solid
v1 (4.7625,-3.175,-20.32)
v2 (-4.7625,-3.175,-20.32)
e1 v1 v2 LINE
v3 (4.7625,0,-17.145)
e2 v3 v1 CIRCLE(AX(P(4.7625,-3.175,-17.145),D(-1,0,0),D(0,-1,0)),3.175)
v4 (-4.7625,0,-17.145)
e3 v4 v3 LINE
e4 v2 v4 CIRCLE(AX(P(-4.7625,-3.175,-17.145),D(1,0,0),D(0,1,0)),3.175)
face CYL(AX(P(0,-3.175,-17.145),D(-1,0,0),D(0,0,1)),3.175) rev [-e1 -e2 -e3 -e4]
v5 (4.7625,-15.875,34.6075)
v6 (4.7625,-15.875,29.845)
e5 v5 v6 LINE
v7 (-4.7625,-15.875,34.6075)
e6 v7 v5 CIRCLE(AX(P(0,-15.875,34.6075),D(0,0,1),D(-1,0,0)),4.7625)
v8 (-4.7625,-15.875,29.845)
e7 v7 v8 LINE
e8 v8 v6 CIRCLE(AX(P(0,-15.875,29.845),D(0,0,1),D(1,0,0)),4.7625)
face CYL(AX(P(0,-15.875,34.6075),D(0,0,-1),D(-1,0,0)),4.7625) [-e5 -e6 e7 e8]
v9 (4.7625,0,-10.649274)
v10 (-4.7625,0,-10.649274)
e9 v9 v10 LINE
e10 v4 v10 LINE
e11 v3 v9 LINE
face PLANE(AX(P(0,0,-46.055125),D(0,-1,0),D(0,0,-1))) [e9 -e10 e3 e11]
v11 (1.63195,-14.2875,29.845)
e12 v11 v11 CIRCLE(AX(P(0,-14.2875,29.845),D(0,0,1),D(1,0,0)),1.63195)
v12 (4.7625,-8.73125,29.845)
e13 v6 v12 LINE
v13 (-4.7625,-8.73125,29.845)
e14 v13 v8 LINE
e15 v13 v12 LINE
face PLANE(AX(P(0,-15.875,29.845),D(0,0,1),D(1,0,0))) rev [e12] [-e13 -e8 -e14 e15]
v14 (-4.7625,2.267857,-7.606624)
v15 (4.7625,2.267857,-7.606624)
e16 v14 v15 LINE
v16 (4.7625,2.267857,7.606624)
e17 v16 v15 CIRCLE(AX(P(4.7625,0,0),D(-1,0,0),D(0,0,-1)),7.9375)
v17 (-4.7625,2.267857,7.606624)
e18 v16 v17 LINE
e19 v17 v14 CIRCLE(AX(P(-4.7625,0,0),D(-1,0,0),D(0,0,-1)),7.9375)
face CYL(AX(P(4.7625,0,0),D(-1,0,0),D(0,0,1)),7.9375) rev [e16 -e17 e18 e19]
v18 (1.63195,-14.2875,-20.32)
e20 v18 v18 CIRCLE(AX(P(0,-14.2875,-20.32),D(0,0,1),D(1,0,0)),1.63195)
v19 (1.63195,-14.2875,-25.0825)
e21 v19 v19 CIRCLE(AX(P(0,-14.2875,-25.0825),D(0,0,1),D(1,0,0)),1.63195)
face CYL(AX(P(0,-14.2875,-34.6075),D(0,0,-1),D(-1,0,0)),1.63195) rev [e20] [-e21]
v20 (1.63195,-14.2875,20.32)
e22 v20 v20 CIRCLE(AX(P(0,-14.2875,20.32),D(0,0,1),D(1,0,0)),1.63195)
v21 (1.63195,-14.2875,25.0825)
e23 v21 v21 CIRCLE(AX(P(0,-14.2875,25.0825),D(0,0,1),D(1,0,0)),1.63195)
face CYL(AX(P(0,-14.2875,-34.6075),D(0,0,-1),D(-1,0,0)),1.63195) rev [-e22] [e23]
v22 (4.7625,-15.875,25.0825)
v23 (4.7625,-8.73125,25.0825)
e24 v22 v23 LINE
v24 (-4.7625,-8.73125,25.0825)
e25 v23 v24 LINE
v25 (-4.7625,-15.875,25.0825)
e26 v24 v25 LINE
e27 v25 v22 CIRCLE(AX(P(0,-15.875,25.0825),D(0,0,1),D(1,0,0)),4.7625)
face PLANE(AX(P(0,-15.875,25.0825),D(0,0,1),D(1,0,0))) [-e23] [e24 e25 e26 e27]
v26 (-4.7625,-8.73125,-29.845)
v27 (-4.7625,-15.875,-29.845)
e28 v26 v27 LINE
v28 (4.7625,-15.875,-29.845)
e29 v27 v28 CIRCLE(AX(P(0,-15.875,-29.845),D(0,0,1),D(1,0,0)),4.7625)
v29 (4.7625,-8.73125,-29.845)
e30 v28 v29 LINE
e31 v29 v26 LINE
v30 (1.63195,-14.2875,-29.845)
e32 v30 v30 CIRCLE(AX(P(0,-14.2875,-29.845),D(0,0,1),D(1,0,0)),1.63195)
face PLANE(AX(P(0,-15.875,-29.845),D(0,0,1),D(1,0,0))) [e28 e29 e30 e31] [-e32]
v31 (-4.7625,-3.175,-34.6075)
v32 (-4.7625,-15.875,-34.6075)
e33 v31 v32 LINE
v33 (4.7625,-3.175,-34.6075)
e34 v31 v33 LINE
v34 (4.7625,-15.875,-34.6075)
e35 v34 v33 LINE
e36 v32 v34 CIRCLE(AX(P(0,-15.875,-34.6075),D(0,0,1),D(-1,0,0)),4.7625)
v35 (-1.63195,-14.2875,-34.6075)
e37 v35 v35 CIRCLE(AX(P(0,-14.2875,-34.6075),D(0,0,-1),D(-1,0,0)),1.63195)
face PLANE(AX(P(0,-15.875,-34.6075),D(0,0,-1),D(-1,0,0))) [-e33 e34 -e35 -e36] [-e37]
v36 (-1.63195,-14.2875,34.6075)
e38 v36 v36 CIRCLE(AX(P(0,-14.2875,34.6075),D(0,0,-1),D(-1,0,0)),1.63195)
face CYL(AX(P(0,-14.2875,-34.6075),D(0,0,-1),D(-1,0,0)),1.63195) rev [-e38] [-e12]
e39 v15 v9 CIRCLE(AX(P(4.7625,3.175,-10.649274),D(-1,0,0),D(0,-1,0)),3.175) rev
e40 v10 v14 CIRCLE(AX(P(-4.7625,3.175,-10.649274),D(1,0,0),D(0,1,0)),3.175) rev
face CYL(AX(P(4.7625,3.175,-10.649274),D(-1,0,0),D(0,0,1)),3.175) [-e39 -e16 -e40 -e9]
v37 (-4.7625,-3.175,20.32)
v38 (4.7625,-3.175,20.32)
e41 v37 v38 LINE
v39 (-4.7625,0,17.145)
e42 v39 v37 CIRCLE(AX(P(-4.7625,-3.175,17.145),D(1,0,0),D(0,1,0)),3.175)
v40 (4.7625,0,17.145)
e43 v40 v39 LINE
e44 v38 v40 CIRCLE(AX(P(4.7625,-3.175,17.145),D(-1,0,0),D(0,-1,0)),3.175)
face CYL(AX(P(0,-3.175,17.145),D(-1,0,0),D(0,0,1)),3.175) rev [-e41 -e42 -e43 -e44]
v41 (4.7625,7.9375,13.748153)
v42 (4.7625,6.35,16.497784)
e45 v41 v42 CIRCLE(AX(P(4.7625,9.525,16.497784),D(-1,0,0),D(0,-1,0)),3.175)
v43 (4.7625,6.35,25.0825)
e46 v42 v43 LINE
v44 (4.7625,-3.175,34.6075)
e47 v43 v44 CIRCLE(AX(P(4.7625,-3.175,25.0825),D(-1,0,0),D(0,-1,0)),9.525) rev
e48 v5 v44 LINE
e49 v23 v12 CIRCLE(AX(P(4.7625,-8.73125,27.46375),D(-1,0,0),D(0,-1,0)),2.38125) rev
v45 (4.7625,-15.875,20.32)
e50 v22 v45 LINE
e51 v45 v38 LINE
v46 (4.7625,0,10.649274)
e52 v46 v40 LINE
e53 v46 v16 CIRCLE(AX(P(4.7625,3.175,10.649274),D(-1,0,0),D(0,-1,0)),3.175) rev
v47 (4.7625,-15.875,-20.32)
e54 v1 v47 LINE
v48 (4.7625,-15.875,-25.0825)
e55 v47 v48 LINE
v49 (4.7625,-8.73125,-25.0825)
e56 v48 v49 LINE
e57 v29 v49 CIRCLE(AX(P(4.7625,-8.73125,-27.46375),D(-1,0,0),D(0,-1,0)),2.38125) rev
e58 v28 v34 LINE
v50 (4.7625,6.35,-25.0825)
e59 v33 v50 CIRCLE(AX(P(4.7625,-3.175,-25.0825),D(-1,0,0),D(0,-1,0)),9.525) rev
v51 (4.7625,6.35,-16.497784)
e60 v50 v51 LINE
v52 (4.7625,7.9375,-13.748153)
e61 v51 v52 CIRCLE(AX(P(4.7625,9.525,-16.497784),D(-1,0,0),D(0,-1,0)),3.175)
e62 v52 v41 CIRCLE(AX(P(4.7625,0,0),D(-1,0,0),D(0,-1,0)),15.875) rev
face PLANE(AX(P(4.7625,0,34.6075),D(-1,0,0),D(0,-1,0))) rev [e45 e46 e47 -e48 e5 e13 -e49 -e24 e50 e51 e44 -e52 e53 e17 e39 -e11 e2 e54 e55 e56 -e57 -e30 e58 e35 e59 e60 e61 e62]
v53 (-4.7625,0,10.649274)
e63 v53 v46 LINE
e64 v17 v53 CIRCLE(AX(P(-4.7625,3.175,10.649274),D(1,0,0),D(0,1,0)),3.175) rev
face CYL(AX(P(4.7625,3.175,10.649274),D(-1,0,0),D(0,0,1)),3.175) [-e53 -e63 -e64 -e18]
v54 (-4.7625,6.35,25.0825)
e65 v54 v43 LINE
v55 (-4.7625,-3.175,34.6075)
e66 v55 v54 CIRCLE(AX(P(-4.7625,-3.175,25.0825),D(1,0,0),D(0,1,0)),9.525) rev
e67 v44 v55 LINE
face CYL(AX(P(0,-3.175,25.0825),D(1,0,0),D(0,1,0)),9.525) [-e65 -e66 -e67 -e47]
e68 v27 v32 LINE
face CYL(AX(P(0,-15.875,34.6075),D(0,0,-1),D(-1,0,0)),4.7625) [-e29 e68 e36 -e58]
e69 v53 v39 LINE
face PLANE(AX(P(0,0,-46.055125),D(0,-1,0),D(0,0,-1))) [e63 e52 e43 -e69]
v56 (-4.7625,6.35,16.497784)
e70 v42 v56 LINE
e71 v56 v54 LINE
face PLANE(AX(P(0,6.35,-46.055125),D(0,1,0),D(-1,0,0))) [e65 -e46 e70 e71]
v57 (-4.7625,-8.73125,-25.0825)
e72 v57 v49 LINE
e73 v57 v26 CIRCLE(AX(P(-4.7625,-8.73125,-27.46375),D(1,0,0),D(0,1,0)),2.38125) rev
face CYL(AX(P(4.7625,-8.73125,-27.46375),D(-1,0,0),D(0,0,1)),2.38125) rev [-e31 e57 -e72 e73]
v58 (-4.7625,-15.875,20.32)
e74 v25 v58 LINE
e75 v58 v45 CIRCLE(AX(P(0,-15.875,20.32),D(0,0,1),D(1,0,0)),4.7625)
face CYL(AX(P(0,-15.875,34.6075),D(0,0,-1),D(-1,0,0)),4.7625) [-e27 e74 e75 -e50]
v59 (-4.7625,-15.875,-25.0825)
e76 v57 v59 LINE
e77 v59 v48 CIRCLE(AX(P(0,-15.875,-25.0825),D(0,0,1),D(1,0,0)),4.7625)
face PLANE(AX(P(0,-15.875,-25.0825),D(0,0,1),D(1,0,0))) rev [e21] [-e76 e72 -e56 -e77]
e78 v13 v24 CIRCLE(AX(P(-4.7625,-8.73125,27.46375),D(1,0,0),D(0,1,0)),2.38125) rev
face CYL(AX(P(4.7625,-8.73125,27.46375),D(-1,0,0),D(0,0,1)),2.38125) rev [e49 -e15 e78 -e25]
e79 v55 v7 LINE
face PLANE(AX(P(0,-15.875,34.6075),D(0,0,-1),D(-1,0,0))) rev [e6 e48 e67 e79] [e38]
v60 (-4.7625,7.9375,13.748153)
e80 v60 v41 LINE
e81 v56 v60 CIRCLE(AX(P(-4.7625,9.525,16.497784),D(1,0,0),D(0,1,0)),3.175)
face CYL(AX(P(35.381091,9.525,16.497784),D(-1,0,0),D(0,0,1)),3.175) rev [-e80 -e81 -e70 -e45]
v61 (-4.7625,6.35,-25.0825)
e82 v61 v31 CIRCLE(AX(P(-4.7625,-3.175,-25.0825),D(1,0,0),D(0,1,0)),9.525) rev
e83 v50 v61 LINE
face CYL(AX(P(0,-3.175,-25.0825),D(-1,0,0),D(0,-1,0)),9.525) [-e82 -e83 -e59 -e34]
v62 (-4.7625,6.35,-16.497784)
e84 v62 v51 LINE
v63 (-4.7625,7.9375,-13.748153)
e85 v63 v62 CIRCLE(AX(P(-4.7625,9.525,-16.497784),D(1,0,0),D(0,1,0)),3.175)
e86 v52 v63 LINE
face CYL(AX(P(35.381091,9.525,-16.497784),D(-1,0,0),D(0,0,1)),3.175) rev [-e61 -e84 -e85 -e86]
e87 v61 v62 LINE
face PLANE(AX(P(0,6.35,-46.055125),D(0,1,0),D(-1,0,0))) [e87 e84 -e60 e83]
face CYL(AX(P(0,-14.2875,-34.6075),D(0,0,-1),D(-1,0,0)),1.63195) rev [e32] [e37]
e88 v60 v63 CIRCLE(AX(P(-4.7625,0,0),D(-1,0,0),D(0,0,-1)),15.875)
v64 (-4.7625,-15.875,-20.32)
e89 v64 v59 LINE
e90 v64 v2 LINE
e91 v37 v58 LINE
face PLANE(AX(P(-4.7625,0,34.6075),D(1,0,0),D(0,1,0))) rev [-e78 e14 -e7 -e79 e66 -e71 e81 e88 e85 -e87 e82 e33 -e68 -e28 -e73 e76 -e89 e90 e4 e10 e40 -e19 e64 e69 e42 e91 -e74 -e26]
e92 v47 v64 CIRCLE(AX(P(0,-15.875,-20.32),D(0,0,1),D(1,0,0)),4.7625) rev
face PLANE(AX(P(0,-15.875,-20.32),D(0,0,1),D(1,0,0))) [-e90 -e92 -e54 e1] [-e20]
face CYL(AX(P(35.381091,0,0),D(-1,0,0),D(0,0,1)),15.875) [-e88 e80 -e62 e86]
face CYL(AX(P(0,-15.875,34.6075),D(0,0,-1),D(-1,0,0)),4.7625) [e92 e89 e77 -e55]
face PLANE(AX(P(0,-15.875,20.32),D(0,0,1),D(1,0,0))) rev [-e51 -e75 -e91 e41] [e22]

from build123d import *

# Parameters (mm, degrees)
BOSS_EXTRUDE1_DEPTH   = 34.6075
CUT_EXTRUDE1_START    = -4.7625
CUT_EXTRUDE1_DEPTH    = 4.7625
CUT_EXTRUDE2_START    = 9.525
CUT_EXTRUDE2_DEPTH    = 4.7625
CUT_EXTRUDE3_START    = -4.7625
CUT_EXTRUDE3_DEPTH    = 40.64
BOSS_EXTRUDE3_START   = 34.6075
SKETCH7_W             = 9.525
SKETCH7_H             = 6.35
BOSS_EXTRUDE3_DEPTH   = 69.215
FILLET1_R             = 3.175
FILLET2_R             = 2.38125
FILLET3_R             = 2.38125
BOSS_EXTRUDE4_DEPTH   = 9.525
CUT_EXTRUDE4_DEPTH    = 42.40423997
FILLET4_R             = 3.175
FILLET5_R             = 9.525
F_4_CLEARANCE_HOLE1_D = 3.2639


with BuildPart() as part:
    # Sketch1 → Boss-Extrude1 (new, symmetric)
    with BuildSketch(Plane.XY):
        with BuildLine():
            Line((-4.7625, 0), (4.7625, 0))
            Line((4.7625, 0), (4.7625, -15.875))
            ThreePointArc((4.7625, -15.875), (0, -20.6375), (-4.7625, -15.875))
            Line((-4.7625, -15.875), (-4.7625, 0))
        make_face()
    extrude(amount=BOSS_EXTRUDE1_DEPTH, both=True)

    # Sketch2 → Cut-Extrude1 (cut)
    with BuildSketch(Plane.XY.offset(34.6075).offset(CUT_EXTRUDE1_START)):
        with BuildLine():
            Line((-4.7625, -15.875), (-4.7625, -6.35))
            Line((-4.7625, -6.35), (4.7625, -6.35))
            Line((4.7625, -6.35), (4.7625, -15.875))
            ThreePointArc((4.7625, -15.875), (0, -20.6375), (-4.7625, -15.875))
        make_face()
    extrude(amount=-CUT_EXTRUDE1_DEPTH, mode=Mode.SUBTRACT)

    # Sketch3 → Cut-Extrude2 (cut)
    with BuildSketch(Plane.XY.offset(-34.6075).offset(CUT_EXTRUDE2_START)):
        with BuildLine():
            Line((-4.7625, -15.875), (-4.7625, -6.35))
            Line((-4.7625, -6.35), (4.7625, -6.35))
            Line((4.7625, -6.35), (4.7625, -15.875))
            ThreePointArc((4.7625, -15.875), (0, -20.6375), (-4.7625, -15.875))
        make_face()
    extrude(amount=-CUT_EXTRUDE2_DEPTH, mode=Mode.SUBTRACT)

    # Sketch5 → Cut-Extrude3 (cut)
    with BuildSketch(Plane.XY.offset(25.0825).offset(CUT_EXTRUDE3_START)):
        with BuildLine():
            Line((4.7625, -15.875), (4.7625, 0))
            Line((4.7625, 0), (-4.7625, 0))
            Line((-4.7625, 0), (-4.7625, -15.875))
            ThreePointArc((-4.7625, -15.875), (0, -20.6375), (4.7625, -15.875))
        make_face()
    extrude(amount=-CUT_EXTRUDE3_DEPTH, mode=Mode.SUBTRACT)


with BuildPart() as cut_extrude3_piece_1:
    # of the separate pieces the step leaves, piece 1, a body of its own (cut_extrude3_pieces)
    add(part.part.solids().sort_by_distance((-4.7625, 0, 20.32))[0])



with BuildPart() as cut_extrude3_piece_2:
    # of the separate pieces the step leaves, piece 2, a body of its own (cut_extrude3_pieces)
    add(part.part.solids().sort_by_distance((-4.7625, -15.875, -34.6075))[0])


with BuildPart() as cut_extrude3_piece_1_1:
    add(cut_extrude3_piece_1.part)

    add(cut_extrude3_piece_2.part)  # Boss-Extrude3 merges Cut-Extrude3 piece 2
    # Sketch7 → Boss-Extrude3 (add)
    with BuildSketch(Plane.XY.offset(BOSS_EXTRUDE3_START)):
        with Locations((0, 3.175)):
            Rectangle(SKETCH7_W, SKETCH7_H)
    extrude(amount=-BOSS_EXTRUDE3_DEPTH)

    # Fillet1
    fillet1_edges = [cut_extrude3_piece_1_1.edges().sort_by_distance(p)[0] for p in [
        (0, 0, 20.32),
        (0, 0, -20.32),
    ]]
    fillet(fillet1_edges, radius=FILLET1_R)

    # Fillet2
    fillet2_edges = [cut_extrude3_piece_1_1.edges().sort_by_distance(p)[0] for p in [
        (0, -6.35, -25.0825),
        (0, -6.35, -29.845),
    ]]
    fillet(fillet2_edges, radius=FILLET2_R - 0.0001)  # a hair under: the kernel refuses the full size

    # Fillet3
    fillet3_edges = [cut_extrude3_piece_1_1.edges().sort_by_distance(p)[0] for p in [
        (0, -6.35, 29.845),
        (0, -6.35, 25.0825),
    ]]
    fillet(fillet3_edges, radius=FILLET3_R - 0.0001)  # a hair under: the kernel refuses the full size

    # Sketch8 → Boss-Extrude4 (add)
    with BuildSketch(Plane.ZY.offset(4.7625)):
        with BuildLine():
            Line((-14.549677831, 6.35), (14.549677831, 6.35))
            ThreePointArc((14.549677831, 6.35), (0, 15.875), (-14.549677831, 6.35))
        make_face()
    extrude(amount=-BOSS_EXTRUDE4_DEPTH)

    # Sketch9 → Cut-Extrude4 (cut, through all)
    with BuildSketch(Plane.ZY.offset(4.7625)):
        with BuildLine():
            Line((-7.9375, 0), (7.9375, 0))
            ThreePointArc((7.9375, 0), (0, 7.9375), (-7.9375, 0))
        make_face()
    extrude(amount=-CUT_EXTRUDE4_DEPTH, mode=Mode.SUBTRACT)

    # Fillet4
    fillet4_edges = [cut_extrude3_piece_1_1.edges().sort_by_distance(p)[0] for p in [
        (0, 6.35, -14.549677831),
        (0, 6.35, 14.549677831),
        (0, 0, -7.9375),
        (0, 0, 7.9375),
    ]]
    fillet(fillet4_edges, radius=FILLET4_R)

    # Fillet5
    fillet5_edges = [cut_extrude3_piece_1_1.edges().sort_by_distance(p)[0] for p in [
        (0, 6.35, 34.6075),
        (0, 6.35, -34.6075),
    ]]
    fillet(fillet5_edges, radius=FILLET5_R)

    # #4 Clearance Hole1 (through all)
    with Locations(Plane(origin=(0, 0, -34.6075), x_dir=(-1, 0, 0), z_dir=(0, 0, -1))):
        with Locations((0, -14.2875)):
            Hole(F_4_CLEARANCE_HOLE1_D / 2)


solid = cut_extrude3_piece_1_1.part
